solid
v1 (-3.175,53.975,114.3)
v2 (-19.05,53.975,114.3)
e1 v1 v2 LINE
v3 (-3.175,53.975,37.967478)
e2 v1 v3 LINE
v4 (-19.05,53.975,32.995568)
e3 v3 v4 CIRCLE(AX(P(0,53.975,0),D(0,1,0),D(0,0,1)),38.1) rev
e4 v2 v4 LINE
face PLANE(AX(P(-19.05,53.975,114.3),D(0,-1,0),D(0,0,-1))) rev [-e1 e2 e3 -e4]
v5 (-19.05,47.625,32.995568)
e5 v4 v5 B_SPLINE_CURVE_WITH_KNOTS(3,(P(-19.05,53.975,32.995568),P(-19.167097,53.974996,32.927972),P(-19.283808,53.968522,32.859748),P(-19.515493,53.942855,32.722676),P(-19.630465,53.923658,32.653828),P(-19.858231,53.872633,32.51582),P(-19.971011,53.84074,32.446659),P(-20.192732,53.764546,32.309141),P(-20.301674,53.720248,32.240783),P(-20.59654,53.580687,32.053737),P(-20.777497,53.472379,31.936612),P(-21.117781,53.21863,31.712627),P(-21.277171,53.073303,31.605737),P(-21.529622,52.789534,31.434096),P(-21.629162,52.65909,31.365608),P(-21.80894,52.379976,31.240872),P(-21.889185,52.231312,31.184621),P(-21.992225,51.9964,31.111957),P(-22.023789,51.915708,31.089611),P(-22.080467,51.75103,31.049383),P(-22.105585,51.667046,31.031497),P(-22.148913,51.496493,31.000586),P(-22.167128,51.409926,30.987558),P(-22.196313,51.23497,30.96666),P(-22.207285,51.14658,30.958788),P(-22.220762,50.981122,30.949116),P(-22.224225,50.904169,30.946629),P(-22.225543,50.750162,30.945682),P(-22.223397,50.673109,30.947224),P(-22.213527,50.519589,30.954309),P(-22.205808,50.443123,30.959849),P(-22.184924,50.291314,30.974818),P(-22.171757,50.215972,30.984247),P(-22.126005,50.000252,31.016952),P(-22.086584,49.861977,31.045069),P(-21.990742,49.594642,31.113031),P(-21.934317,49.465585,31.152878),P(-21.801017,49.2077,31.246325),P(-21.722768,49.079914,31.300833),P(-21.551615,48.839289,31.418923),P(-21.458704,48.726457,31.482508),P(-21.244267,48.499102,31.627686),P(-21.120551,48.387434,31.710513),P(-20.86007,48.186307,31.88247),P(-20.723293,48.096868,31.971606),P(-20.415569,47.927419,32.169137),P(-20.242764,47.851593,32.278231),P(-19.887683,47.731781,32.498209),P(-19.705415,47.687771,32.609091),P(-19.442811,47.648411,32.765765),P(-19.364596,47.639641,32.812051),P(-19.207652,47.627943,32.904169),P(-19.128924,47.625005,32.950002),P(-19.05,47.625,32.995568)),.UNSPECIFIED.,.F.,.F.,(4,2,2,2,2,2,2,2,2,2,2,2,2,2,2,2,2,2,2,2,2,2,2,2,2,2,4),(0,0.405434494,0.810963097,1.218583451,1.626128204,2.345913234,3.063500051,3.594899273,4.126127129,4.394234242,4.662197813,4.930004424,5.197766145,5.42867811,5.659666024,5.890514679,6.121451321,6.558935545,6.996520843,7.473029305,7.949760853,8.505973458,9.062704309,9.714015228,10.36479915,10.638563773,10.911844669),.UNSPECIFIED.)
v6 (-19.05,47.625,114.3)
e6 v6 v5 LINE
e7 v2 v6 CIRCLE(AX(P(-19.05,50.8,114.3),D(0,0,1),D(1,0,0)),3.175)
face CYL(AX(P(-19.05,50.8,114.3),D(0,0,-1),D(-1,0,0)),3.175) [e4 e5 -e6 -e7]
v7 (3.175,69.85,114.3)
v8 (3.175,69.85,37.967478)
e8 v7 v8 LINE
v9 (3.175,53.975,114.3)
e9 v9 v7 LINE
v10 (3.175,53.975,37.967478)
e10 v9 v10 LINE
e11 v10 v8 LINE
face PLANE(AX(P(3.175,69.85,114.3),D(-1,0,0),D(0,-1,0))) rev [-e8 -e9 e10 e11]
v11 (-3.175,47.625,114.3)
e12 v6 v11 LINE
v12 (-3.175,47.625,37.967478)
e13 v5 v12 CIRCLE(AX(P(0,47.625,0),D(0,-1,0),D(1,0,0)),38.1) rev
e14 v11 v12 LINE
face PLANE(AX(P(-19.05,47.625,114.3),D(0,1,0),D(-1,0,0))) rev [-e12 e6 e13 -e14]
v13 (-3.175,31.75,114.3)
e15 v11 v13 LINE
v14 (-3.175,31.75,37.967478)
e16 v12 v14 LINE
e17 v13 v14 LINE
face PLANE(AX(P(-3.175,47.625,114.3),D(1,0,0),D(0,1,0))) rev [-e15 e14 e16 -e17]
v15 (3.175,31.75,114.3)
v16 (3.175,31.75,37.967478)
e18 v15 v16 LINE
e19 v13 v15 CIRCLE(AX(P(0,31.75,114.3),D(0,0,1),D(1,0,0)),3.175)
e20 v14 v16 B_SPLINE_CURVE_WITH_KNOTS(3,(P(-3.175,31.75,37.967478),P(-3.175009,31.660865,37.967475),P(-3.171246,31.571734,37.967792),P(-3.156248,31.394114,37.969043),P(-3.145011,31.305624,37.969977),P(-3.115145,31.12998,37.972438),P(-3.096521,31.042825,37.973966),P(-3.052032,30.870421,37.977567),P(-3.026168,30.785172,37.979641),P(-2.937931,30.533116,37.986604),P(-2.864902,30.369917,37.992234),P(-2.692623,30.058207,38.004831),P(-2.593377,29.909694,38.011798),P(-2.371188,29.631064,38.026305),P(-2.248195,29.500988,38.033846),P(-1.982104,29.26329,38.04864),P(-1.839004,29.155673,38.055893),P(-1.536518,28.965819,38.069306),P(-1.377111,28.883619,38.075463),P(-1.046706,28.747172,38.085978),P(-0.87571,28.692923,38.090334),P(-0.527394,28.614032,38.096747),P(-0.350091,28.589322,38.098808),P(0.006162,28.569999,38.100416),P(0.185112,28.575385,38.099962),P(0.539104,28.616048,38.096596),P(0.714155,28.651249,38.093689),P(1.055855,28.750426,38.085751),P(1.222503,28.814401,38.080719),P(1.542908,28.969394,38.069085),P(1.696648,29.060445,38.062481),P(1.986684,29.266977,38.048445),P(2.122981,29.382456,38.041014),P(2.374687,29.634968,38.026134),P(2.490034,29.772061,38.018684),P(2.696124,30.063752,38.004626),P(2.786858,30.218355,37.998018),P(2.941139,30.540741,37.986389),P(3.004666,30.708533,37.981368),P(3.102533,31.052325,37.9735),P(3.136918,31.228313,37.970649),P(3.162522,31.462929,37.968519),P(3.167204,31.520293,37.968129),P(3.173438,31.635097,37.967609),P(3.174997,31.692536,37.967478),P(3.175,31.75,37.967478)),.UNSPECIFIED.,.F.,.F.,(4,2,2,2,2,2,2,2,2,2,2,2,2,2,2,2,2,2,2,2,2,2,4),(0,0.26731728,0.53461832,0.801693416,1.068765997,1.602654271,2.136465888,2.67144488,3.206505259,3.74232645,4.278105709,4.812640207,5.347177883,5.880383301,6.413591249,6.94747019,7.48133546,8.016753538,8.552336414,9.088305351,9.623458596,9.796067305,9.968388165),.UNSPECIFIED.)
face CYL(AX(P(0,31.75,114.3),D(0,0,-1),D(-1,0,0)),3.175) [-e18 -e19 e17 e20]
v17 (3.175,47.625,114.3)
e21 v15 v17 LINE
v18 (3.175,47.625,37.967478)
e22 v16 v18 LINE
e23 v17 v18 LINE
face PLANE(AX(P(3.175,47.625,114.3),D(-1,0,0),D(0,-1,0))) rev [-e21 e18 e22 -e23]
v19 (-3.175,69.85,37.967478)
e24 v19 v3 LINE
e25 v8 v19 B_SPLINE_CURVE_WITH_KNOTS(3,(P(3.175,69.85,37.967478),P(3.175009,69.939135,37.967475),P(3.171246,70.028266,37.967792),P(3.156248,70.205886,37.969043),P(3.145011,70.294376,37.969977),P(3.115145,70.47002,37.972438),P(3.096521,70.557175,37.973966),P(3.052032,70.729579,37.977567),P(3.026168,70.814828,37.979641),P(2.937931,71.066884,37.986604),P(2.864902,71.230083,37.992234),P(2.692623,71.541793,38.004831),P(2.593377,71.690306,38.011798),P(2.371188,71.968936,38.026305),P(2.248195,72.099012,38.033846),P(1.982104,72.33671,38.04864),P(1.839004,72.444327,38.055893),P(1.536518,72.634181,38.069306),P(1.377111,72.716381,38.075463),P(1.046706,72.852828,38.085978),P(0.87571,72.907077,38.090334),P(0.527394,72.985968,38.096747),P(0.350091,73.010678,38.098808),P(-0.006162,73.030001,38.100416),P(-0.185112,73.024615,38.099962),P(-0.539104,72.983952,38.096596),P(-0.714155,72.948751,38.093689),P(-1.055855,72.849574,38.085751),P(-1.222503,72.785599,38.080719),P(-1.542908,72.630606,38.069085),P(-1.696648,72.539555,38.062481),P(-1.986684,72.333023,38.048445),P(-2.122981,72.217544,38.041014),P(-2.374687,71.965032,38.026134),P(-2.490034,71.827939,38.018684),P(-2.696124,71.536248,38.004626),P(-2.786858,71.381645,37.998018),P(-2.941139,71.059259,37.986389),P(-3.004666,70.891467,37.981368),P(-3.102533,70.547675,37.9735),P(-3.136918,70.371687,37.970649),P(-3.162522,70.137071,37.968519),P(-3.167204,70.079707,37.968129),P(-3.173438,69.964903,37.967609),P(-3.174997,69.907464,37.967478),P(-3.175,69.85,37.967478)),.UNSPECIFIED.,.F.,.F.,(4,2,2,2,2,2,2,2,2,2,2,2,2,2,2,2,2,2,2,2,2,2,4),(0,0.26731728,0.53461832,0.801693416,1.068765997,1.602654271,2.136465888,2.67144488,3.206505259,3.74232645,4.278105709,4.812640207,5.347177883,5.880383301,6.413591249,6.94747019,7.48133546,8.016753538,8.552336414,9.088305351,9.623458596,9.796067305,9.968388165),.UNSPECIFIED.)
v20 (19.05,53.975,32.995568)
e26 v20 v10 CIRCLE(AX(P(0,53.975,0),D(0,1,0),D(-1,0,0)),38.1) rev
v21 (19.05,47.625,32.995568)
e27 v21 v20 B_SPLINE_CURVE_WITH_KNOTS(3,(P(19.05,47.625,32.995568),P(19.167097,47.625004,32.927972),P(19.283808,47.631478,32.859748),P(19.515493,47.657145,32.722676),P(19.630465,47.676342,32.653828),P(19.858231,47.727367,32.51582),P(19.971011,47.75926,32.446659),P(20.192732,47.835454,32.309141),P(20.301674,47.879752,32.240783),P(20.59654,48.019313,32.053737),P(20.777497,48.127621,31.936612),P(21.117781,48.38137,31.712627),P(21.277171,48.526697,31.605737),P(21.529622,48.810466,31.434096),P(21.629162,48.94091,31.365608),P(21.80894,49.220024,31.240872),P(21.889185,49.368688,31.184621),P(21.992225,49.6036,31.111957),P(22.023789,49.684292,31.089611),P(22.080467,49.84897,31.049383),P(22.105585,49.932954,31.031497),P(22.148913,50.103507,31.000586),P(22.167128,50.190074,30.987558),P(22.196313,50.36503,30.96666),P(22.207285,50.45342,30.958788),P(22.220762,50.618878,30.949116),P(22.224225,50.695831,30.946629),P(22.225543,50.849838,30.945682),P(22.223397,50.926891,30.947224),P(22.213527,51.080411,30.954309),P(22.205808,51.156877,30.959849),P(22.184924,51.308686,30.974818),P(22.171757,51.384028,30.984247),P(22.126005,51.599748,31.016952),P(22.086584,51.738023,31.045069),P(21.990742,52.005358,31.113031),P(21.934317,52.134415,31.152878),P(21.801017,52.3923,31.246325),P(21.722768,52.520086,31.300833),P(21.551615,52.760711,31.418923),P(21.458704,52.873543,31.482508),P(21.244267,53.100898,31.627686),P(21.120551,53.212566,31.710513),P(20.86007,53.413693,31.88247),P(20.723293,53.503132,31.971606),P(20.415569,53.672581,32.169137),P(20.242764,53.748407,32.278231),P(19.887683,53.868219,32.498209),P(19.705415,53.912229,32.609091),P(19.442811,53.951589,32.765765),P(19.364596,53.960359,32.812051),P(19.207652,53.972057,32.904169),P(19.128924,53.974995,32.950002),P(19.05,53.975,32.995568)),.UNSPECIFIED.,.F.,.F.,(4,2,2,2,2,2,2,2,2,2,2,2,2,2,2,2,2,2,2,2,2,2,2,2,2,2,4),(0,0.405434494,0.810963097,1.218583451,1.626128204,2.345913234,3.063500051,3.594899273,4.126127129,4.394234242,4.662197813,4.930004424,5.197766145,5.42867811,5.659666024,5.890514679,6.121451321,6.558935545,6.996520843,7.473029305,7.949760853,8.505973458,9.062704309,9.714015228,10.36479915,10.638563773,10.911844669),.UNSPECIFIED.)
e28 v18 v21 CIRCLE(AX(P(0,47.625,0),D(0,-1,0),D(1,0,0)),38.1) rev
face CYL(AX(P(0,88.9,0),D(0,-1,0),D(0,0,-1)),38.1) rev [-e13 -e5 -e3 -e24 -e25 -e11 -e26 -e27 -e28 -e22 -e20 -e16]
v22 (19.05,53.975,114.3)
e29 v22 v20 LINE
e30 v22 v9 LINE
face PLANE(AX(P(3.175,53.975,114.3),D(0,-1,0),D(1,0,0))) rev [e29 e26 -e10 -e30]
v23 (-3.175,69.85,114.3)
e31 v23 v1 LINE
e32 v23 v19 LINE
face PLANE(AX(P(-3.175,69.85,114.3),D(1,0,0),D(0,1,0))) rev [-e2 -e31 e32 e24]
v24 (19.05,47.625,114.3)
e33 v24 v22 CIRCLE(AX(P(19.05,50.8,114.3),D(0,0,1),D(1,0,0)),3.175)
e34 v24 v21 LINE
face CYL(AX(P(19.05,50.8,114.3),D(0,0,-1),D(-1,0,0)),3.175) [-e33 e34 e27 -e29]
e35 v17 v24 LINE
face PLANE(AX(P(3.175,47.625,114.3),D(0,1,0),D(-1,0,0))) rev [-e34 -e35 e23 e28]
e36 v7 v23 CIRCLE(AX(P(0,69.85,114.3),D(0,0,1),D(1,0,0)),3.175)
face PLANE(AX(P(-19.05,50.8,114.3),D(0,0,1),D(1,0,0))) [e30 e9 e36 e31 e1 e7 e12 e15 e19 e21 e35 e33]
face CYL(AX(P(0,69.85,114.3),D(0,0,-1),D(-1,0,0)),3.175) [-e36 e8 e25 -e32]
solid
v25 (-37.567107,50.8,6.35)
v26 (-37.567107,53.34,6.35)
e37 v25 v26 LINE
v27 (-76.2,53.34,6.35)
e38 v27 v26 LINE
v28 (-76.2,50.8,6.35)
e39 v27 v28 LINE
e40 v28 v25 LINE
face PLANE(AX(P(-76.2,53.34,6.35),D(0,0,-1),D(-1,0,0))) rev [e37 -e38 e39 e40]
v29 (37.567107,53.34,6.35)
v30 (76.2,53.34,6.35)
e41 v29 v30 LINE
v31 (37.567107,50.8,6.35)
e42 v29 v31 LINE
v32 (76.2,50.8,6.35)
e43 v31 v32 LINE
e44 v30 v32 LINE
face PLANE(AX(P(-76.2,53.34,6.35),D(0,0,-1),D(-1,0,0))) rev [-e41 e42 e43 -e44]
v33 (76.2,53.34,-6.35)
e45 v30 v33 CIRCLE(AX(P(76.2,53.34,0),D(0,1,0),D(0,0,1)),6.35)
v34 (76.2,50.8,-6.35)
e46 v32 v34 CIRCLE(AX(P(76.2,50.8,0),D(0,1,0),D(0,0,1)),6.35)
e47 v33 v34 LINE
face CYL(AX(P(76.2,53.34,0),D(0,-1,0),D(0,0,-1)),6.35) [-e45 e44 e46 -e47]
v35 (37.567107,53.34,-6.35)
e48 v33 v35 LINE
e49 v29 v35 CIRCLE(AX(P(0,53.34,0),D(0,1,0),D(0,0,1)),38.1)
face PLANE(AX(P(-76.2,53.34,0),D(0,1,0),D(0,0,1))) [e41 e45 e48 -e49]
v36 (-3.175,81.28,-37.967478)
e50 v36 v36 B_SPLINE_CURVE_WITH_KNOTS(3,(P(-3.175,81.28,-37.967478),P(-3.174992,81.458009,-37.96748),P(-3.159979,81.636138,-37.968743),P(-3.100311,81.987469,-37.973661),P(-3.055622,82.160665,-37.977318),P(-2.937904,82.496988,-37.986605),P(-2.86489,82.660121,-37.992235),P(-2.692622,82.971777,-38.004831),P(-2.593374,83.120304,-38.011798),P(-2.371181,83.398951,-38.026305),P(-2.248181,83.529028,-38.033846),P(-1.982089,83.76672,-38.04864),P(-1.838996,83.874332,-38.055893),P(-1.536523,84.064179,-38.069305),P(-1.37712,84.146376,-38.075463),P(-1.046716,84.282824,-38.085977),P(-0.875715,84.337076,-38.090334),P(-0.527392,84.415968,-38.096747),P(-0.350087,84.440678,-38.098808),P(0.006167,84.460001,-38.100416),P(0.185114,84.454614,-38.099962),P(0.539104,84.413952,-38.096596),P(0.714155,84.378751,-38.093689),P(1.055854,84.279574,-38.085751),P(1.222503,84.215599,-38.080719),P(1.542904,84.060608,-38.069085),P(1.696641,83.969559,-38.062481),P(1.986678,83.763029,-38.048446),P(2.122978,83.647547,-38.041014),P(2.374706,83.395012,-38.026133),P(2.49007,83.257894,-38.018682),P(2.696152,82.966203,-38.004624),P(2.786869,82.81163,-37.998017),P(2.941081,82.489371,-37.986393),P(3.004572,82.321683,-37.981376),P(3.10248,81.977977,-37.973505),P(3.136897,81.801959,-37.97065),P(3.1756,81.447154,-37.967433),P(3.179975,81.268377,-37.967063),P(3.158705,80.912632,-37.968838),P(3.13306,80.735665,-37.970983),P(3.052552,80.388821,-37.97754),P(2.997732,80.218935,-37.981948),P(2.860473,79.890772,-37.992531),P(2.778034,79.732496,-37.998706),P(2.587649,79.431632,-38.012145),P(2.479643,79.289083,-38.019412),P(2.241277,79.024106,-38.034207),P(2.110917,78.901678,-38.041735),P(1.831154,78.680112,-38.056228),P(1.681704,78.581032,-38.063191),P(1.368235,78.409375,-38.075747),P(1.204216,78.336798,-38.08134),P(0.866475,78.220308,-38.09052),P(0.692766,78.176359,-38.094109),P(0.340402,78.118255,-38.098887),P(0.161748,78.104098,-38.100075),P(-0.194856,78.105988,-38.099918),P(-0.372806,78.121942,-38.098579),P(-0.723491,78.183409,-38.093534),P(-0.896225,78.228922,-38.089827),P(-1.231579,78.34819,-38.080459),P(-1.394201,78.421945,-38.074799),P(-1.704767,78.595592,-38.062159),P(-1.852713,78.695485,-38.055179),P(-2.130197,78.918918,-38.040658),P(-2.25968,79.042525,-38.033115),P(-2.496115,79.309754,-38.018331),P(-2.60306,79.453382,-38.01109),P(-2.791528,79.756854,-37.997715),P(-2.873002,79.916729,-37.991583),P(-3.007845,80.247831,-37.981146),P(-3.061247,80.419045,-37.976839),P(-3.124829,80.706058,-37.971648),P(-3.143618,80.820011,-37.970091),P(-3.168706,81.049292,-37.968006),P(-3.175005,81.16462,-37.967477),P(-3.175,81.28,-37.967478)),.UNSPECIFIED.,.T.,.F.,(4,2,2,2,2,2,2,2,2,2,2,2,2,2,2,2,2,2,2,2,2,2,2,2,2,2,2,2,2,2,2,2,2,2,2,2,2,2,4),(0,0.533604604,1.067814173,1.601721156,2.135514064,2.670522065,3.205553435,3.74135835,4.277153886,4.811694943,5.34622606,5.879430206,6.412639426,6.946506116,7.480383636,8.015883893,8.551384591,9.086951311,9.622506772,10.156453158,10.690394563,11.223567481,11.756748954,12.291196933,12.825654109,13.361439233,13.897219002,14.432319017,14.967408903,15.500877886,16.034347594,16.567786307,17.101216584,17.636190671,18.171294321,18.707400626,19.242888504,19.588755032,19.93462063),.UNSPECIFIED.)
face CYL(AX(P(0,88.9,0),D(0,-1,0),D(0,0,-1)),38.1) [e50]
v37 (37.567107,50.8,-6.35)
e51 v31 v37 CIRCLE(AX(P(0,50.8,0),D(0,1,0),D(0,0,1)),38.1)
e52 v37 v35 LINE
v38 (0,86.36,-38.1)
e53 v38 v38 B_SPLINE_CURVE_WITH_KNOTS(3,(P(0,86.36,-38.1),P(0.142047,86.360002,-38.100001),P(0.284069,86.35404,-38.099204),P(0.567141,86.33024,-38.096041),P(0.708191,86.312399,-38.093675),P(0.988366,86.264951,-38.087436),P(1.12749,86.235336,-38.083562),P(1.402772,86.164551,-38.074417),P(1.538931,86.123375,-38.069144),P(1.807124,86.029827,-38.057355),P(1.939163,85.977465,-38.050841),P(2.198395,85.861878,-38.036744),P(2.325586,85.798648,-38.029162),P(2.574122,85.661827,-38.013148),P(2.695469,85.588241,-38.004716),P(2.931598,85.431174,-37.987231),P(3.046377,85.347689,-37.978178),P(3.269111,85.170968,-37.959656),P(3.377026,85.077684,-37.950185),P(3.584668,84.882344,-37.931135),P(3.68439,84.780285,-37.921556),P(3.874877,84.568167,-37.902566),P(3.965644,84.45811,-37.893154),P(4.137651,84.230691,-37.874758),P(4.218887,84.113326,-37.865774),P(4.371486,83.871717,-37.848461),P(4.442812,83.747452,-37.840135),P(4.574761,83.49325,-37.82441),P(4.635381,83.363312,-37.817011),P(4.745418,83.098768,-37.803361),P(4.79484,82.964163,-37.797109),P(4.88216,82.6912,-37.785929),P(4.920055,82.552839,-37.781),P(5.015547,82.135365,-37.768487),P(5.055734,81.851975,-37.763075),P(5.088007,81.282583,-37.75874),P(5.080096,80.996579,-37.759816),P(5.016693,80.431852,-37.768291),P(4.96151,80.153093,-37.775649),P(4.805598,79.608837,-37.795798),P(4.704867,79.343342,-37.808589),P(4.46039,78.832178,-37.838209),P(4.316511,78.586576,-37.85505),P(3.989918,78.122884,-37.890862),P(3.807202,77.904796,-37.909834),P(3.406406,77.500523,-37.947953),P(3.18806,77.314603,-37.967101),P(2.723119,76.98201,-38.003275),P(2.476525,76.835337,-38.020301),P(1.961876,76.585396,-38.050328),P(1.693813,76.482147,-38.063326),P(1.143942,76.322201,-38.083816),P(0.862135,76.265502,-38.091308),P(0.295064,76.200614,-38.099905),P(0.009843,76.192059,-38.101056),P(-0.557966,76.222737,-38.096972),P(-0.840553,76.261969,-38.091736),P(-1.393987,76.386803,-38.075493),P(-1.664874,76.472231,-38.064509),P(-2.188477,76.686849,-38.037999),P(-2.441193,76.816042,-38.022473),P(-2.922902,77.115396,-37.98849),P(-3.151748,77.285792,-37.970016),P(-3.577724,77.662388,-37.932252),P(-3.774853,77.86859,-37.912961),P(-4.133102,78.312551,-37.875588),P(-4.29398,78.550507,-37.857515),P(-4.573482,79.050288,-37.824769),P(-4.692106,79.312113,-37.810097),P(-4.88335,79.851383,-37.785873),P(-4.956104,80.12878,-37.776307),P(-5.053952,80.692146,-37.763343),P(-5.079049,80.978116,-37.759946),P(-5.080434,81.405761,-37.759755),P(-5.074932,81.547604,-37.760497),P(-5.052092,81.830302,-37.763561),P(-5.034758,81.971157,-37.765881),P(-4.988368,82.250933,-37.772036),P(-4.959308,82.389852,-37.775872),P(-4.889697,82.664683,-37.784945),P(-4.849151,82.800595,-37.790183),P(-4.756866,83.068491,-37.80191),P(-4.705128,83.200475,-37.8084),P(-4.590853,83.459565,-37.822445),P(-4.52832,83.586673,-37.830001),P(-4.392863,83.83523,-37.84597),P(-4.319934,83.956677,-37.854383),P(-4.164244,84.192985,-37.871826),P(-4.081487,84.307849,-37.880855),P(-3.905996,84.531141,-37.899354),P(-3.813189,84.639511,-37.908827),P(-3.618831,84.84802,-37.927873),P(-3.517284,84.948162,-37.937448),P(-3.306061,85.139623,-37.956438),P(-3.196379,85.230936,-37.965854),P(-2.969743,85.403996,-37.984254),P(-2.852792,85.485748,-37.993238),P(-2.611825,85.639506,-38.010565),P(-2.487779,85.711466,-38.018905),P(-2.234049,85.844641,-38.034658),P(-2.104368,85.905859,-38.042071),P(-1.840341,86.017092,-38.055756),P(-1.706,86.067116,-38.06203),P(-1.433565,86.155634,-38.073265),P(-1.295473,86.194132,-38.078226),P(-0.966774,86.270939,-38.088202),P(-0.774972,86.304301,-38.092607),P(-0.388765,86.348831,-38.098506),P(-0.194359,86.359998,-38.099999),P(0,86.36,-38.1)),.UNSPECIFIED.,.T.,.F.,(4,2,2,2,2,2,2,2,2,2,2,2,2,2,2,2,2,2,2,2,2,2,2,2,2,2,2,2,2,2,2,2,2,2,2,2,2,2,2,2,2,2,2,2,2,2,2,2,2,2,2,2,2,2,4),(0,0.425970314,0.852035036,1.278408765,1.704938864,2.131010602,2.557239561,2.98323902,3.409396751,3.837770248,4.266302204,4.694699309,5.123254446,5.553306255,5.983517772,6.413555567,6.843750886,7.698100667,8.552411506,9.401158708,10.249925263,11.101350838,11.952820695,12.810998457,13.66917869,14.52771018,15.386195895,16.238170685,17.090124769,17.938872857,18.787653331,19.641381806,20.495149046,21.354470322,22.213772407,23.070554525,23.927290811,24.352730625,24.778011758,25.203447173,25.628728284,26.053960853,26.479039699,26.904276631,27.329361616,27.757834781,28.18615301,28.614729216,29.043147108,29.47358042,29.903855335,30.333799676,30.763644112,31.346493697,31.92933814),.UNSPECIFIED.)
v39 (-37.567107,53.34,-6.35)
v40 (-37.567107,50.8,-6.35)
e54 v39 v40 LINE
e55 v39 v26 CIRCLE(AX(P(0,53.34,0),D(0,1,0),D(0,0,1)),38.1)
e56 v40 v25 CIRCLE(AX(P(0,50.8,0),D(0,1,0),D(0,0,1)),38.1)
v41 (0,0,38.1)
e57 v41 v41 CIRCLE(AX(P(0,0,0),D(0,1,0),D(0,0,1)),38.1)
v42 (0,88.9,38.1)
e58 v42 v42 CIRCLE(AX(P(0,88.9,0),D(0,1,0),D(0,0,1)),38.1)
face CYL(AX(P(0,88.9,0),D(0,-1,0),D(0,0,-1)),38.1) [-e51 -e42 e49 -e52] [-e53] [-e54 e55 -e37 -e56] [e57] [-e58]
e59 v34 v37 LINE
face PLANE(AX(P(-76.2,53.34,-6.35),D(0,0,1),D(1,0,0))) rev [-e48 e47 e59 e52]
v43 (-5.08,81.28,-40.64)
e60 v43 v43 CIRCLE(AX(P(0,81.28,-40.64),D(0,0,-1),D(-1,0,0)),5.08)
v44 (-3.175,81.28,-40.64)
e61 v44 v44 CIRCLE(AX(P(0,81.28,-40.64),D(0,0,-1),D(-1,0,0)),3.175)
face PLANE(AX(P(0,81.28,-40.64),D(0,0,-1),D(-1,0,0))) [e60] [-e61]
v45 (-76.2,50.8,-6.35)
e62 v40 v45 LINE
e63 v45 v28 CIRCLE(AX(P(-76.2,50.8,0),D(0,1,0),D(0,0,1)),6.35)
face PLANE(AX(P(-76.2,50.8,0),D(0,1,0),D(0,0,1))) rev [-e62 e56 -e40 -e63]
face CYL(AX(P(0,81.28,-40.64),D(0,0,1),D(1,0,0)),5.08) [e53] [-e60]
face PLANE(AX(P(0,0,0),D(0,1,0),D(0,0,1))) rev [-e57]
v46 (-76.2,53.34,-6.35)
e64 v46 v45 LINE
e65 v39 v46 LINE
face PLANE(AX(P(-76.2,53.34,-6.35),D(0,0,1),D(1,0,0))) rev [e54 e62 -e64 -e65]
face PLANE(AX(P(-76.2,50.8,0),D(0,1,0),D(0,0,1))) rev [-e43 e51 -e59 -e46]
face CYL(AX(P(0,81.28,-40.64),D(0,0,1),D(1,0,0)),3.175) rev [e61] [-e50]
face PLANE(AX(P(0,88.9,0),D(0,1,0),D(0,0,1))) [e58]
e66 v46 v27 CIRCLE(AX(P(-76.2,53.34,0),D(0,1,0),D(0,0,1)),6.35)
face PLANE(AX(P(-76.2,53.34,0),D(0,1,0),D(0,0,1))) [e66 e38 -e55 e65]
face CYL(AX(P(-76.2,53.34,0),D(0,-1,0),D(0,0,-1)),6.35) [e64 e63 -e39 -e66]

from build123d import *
from build123d.topology import SkipClean

# Parameters (mm, degrees)
SKETCH1_R                       = 38.1
BOSS_EXTRUDE1_DEPTH             = 88.9
BOSS_EXTRUDE2_DEPTH             = 2.54
BOSS_EXTRUDE4_REACH             = 145.263
BOSS_EXTRUDE4_END_RADIUS        = 38.1
BOSS_EXTRUDE4_DIRECTION_2_DEPTH = 76.2
BOSS_EXTRUDE7_REACH             = 196.791
BOSS_EXTRUDE7_END_RADIUS        = 38.1
SKETCH7_R                       = 5.08
SKETCH7_R_2                     = 3.175
BOSS_EXTRUDE7_DIRECTION_2_DEPTH = 2.54


with BuildPart() as part:
    # Sketch1 → Boss-Extrude1 (new body)
    with BuildSketch(Plane(origin=(0, 0, 0), x_dir=(1, 0, 0), z_dir=(0, 1, 0))):
        Circle(SKETCH1_R)
    extrude(amount=BOSS_EXTRUDE1_DEPTH)

    # Sketch3 → Boss-Extrude2 (add)
    with BuildSketch(Plane(origin=(0, 50.8, 0), x_dir=(1, 0, 0), z_dir=(0, 1, 0))):
        with BuildLine():
            Line((-76.2, 6.35), (76.2, 6.35))
            ThreePointArc((76.2, 6.35), (82.55, 0), (76.2, -6.35))
            Line((76.2, -6.35), (-76.2, -6.35))
            ThreePointArc((-76.2, -6.35), (-82.55, 0), (-76.2, 6.35))
        make_face()
    extrude(amount=BOSS_EXTRUDE2_DEPTH)

    # Boss-Extrude7: up to this cylinder (the profile starts outside it)
    boss_extrude7_end = Plane(origin=(0, 81.28, 0), z_dir=(0, -1, 0)) * Cylinder(BOSS_EXTRUDE7_END_RADIUS, 470.782, mode=Mode.PRIVATE)
    # Sketch7 → Boss-Extrude7 (add, up to the surface)
    with BuildSketch(Plane(origin=(0, 88.9, -38.1), x_dir=(-1, 0, 0), z_dir=(0, 0, -1)), mode=Mode.PRIVATE) as boss_extrude7_sk1:
        with Locations((0, -7.62)):
            Circle(SKETCH7_R)
        with Locations((0, -7.62)):
            Circle(SKETCH7_R_2, mode=Mode.SUBTRACT)
    boss_extrude7_tool1 = extrude(boss_extrude7_sk1.sketch, amount=-BOSS_EXTRUDE7_REACH, mode=Mode.PRIVATE) - boss_extrude7_end
    add(boss_extrude7_tool1.solids().sort_by_distance((4.936316, 81.28, -38.1))[0])
    add(boss_extrude7_tool1.solids().sort_by_distance((4.936316, 81.28, -38.1))[1])

    # Sketch7 → Boss-Extrude7 direction 2 (add)
    with SkipClean():  # the faces are left unmerged after this step: merging them gives an invalid solid
        with BuildSketch(Plane(origin=(0, 88.9, -38.1), x_dir=(-1, 0, 0), z_dir=(0, 0, -1))):
            with Locations((0, -7.62)):
                Circle(SKETCH7_R)
            with Locations((0, -7.62)):
                Circle(SKETCH7_R_2, mode=Mode.SUBTRACT)
        extrude(amount=BOSS_EXTRUDE7_DIRECTION_2_DEPTH)


with BuildPart() as body_2:
    # Boss-Extrude4: up to this cylinder (the profile starts outside it)
    boss_extrude4_end = Plane(origin=(0, 50.8, 0), z_dir=(0, -1, 0)) * Cylinder(BOSS_EXTRUDE4_END_RADIUS, 367.726, mode=Mode.PRIVATE)
    # Sketch5 → Boss-Extrude4 (new, up to the surface)
    with BuildSketch(Plane.XY.offset(38.1), mode=Mode.PRIVATE) as boss_extrude4_sk1:
        with BuildLine():
            Line((-19.05, 53.975), (-3.175, 53.975))
            Line((-3.175, 53.975), (-3.175, 69.85))
            ThreePointArc((-3.175, 69.85), (0, 73.025), (3.175, 69.85))
            Line((3.175, 69.85), (3.175, 53.975))
            Line((3.175, 53.975), (19.05, 53.975))
            ThreePointArc((19.05, 53.975), (22.225, 50.8), (19.05, 47.625))
            Line((19.05, 47.625), (3.175, 47.625))
            Line((3.175, 47.625), (3.175, 31.75))
            ThreePointArc((3.175, 31.75), (0, 28.575), (-3.175, 31.75))
            Line((-3.175, 31.75), (-3.175, 47.625))
            Line((-3.175, 47.625), (-19.05, 47.625))
            ThreePointArc((-19.05, 47.625), (-22.225, 50.8), (-19.05, 53.975))
        make_face()
    boss_extrude4_tool1 = extrude(boss_extrude4_sk1.sketch, amount=-BOSS_EXTRUDE4_REACH, mode=Mode.PRIVATE) - boss_extrude4_end
    add(boss_extrude4_tool1.solids().sort_by_distance((0, 50.8, 38.1))[0])
    add(boss_extrude4_tool1.solids().sort_by_distance((0, 50.8, 38.1))[1])

    # Sketch5 → Boss-Extrude4 direction 2 (add)
    with BuildSketch(Plane.XY.offset(38.1)):
        with BuildLine():
            Line((-19.05, 53.975), (-3.175, 53.975))
            Line((-3.175, 53.975), (-3.175, 69.85))
            ThreePointArc((-3.175, 69.85), (0, 73.025), (3.175, 69.85))
            Line((3.175, 69.85), (3.175, 53.975))
            Line((3.175, 53.975), (19.05, 53.975))
            ThreePointArc((19.05, 53.975), (22.225, 50.8), (19.05, 47.625))
            Line((19.05, 47.625), (3.175, 47.625))
            Line((3.175, 47.625), (3.175, 31.75))
            ThreePointArc((3.175, 31.75), (0, 28.575), (-3.175, 31.75))
            Line((-3.175, 31.75), (-3.175, 47.625))
            Line((-3.175, 47.625), (-19.05, 47.625))
            ThreePointArc((-19.05, 47.625), (-22.225, 50.8), (-19.05, 53.975))
        make_face()
    extrude(amount=BOSS_EXTRUDE4_DIRECTION_2_DEPTH)


solid = Compound([part.part, body_2.part])
